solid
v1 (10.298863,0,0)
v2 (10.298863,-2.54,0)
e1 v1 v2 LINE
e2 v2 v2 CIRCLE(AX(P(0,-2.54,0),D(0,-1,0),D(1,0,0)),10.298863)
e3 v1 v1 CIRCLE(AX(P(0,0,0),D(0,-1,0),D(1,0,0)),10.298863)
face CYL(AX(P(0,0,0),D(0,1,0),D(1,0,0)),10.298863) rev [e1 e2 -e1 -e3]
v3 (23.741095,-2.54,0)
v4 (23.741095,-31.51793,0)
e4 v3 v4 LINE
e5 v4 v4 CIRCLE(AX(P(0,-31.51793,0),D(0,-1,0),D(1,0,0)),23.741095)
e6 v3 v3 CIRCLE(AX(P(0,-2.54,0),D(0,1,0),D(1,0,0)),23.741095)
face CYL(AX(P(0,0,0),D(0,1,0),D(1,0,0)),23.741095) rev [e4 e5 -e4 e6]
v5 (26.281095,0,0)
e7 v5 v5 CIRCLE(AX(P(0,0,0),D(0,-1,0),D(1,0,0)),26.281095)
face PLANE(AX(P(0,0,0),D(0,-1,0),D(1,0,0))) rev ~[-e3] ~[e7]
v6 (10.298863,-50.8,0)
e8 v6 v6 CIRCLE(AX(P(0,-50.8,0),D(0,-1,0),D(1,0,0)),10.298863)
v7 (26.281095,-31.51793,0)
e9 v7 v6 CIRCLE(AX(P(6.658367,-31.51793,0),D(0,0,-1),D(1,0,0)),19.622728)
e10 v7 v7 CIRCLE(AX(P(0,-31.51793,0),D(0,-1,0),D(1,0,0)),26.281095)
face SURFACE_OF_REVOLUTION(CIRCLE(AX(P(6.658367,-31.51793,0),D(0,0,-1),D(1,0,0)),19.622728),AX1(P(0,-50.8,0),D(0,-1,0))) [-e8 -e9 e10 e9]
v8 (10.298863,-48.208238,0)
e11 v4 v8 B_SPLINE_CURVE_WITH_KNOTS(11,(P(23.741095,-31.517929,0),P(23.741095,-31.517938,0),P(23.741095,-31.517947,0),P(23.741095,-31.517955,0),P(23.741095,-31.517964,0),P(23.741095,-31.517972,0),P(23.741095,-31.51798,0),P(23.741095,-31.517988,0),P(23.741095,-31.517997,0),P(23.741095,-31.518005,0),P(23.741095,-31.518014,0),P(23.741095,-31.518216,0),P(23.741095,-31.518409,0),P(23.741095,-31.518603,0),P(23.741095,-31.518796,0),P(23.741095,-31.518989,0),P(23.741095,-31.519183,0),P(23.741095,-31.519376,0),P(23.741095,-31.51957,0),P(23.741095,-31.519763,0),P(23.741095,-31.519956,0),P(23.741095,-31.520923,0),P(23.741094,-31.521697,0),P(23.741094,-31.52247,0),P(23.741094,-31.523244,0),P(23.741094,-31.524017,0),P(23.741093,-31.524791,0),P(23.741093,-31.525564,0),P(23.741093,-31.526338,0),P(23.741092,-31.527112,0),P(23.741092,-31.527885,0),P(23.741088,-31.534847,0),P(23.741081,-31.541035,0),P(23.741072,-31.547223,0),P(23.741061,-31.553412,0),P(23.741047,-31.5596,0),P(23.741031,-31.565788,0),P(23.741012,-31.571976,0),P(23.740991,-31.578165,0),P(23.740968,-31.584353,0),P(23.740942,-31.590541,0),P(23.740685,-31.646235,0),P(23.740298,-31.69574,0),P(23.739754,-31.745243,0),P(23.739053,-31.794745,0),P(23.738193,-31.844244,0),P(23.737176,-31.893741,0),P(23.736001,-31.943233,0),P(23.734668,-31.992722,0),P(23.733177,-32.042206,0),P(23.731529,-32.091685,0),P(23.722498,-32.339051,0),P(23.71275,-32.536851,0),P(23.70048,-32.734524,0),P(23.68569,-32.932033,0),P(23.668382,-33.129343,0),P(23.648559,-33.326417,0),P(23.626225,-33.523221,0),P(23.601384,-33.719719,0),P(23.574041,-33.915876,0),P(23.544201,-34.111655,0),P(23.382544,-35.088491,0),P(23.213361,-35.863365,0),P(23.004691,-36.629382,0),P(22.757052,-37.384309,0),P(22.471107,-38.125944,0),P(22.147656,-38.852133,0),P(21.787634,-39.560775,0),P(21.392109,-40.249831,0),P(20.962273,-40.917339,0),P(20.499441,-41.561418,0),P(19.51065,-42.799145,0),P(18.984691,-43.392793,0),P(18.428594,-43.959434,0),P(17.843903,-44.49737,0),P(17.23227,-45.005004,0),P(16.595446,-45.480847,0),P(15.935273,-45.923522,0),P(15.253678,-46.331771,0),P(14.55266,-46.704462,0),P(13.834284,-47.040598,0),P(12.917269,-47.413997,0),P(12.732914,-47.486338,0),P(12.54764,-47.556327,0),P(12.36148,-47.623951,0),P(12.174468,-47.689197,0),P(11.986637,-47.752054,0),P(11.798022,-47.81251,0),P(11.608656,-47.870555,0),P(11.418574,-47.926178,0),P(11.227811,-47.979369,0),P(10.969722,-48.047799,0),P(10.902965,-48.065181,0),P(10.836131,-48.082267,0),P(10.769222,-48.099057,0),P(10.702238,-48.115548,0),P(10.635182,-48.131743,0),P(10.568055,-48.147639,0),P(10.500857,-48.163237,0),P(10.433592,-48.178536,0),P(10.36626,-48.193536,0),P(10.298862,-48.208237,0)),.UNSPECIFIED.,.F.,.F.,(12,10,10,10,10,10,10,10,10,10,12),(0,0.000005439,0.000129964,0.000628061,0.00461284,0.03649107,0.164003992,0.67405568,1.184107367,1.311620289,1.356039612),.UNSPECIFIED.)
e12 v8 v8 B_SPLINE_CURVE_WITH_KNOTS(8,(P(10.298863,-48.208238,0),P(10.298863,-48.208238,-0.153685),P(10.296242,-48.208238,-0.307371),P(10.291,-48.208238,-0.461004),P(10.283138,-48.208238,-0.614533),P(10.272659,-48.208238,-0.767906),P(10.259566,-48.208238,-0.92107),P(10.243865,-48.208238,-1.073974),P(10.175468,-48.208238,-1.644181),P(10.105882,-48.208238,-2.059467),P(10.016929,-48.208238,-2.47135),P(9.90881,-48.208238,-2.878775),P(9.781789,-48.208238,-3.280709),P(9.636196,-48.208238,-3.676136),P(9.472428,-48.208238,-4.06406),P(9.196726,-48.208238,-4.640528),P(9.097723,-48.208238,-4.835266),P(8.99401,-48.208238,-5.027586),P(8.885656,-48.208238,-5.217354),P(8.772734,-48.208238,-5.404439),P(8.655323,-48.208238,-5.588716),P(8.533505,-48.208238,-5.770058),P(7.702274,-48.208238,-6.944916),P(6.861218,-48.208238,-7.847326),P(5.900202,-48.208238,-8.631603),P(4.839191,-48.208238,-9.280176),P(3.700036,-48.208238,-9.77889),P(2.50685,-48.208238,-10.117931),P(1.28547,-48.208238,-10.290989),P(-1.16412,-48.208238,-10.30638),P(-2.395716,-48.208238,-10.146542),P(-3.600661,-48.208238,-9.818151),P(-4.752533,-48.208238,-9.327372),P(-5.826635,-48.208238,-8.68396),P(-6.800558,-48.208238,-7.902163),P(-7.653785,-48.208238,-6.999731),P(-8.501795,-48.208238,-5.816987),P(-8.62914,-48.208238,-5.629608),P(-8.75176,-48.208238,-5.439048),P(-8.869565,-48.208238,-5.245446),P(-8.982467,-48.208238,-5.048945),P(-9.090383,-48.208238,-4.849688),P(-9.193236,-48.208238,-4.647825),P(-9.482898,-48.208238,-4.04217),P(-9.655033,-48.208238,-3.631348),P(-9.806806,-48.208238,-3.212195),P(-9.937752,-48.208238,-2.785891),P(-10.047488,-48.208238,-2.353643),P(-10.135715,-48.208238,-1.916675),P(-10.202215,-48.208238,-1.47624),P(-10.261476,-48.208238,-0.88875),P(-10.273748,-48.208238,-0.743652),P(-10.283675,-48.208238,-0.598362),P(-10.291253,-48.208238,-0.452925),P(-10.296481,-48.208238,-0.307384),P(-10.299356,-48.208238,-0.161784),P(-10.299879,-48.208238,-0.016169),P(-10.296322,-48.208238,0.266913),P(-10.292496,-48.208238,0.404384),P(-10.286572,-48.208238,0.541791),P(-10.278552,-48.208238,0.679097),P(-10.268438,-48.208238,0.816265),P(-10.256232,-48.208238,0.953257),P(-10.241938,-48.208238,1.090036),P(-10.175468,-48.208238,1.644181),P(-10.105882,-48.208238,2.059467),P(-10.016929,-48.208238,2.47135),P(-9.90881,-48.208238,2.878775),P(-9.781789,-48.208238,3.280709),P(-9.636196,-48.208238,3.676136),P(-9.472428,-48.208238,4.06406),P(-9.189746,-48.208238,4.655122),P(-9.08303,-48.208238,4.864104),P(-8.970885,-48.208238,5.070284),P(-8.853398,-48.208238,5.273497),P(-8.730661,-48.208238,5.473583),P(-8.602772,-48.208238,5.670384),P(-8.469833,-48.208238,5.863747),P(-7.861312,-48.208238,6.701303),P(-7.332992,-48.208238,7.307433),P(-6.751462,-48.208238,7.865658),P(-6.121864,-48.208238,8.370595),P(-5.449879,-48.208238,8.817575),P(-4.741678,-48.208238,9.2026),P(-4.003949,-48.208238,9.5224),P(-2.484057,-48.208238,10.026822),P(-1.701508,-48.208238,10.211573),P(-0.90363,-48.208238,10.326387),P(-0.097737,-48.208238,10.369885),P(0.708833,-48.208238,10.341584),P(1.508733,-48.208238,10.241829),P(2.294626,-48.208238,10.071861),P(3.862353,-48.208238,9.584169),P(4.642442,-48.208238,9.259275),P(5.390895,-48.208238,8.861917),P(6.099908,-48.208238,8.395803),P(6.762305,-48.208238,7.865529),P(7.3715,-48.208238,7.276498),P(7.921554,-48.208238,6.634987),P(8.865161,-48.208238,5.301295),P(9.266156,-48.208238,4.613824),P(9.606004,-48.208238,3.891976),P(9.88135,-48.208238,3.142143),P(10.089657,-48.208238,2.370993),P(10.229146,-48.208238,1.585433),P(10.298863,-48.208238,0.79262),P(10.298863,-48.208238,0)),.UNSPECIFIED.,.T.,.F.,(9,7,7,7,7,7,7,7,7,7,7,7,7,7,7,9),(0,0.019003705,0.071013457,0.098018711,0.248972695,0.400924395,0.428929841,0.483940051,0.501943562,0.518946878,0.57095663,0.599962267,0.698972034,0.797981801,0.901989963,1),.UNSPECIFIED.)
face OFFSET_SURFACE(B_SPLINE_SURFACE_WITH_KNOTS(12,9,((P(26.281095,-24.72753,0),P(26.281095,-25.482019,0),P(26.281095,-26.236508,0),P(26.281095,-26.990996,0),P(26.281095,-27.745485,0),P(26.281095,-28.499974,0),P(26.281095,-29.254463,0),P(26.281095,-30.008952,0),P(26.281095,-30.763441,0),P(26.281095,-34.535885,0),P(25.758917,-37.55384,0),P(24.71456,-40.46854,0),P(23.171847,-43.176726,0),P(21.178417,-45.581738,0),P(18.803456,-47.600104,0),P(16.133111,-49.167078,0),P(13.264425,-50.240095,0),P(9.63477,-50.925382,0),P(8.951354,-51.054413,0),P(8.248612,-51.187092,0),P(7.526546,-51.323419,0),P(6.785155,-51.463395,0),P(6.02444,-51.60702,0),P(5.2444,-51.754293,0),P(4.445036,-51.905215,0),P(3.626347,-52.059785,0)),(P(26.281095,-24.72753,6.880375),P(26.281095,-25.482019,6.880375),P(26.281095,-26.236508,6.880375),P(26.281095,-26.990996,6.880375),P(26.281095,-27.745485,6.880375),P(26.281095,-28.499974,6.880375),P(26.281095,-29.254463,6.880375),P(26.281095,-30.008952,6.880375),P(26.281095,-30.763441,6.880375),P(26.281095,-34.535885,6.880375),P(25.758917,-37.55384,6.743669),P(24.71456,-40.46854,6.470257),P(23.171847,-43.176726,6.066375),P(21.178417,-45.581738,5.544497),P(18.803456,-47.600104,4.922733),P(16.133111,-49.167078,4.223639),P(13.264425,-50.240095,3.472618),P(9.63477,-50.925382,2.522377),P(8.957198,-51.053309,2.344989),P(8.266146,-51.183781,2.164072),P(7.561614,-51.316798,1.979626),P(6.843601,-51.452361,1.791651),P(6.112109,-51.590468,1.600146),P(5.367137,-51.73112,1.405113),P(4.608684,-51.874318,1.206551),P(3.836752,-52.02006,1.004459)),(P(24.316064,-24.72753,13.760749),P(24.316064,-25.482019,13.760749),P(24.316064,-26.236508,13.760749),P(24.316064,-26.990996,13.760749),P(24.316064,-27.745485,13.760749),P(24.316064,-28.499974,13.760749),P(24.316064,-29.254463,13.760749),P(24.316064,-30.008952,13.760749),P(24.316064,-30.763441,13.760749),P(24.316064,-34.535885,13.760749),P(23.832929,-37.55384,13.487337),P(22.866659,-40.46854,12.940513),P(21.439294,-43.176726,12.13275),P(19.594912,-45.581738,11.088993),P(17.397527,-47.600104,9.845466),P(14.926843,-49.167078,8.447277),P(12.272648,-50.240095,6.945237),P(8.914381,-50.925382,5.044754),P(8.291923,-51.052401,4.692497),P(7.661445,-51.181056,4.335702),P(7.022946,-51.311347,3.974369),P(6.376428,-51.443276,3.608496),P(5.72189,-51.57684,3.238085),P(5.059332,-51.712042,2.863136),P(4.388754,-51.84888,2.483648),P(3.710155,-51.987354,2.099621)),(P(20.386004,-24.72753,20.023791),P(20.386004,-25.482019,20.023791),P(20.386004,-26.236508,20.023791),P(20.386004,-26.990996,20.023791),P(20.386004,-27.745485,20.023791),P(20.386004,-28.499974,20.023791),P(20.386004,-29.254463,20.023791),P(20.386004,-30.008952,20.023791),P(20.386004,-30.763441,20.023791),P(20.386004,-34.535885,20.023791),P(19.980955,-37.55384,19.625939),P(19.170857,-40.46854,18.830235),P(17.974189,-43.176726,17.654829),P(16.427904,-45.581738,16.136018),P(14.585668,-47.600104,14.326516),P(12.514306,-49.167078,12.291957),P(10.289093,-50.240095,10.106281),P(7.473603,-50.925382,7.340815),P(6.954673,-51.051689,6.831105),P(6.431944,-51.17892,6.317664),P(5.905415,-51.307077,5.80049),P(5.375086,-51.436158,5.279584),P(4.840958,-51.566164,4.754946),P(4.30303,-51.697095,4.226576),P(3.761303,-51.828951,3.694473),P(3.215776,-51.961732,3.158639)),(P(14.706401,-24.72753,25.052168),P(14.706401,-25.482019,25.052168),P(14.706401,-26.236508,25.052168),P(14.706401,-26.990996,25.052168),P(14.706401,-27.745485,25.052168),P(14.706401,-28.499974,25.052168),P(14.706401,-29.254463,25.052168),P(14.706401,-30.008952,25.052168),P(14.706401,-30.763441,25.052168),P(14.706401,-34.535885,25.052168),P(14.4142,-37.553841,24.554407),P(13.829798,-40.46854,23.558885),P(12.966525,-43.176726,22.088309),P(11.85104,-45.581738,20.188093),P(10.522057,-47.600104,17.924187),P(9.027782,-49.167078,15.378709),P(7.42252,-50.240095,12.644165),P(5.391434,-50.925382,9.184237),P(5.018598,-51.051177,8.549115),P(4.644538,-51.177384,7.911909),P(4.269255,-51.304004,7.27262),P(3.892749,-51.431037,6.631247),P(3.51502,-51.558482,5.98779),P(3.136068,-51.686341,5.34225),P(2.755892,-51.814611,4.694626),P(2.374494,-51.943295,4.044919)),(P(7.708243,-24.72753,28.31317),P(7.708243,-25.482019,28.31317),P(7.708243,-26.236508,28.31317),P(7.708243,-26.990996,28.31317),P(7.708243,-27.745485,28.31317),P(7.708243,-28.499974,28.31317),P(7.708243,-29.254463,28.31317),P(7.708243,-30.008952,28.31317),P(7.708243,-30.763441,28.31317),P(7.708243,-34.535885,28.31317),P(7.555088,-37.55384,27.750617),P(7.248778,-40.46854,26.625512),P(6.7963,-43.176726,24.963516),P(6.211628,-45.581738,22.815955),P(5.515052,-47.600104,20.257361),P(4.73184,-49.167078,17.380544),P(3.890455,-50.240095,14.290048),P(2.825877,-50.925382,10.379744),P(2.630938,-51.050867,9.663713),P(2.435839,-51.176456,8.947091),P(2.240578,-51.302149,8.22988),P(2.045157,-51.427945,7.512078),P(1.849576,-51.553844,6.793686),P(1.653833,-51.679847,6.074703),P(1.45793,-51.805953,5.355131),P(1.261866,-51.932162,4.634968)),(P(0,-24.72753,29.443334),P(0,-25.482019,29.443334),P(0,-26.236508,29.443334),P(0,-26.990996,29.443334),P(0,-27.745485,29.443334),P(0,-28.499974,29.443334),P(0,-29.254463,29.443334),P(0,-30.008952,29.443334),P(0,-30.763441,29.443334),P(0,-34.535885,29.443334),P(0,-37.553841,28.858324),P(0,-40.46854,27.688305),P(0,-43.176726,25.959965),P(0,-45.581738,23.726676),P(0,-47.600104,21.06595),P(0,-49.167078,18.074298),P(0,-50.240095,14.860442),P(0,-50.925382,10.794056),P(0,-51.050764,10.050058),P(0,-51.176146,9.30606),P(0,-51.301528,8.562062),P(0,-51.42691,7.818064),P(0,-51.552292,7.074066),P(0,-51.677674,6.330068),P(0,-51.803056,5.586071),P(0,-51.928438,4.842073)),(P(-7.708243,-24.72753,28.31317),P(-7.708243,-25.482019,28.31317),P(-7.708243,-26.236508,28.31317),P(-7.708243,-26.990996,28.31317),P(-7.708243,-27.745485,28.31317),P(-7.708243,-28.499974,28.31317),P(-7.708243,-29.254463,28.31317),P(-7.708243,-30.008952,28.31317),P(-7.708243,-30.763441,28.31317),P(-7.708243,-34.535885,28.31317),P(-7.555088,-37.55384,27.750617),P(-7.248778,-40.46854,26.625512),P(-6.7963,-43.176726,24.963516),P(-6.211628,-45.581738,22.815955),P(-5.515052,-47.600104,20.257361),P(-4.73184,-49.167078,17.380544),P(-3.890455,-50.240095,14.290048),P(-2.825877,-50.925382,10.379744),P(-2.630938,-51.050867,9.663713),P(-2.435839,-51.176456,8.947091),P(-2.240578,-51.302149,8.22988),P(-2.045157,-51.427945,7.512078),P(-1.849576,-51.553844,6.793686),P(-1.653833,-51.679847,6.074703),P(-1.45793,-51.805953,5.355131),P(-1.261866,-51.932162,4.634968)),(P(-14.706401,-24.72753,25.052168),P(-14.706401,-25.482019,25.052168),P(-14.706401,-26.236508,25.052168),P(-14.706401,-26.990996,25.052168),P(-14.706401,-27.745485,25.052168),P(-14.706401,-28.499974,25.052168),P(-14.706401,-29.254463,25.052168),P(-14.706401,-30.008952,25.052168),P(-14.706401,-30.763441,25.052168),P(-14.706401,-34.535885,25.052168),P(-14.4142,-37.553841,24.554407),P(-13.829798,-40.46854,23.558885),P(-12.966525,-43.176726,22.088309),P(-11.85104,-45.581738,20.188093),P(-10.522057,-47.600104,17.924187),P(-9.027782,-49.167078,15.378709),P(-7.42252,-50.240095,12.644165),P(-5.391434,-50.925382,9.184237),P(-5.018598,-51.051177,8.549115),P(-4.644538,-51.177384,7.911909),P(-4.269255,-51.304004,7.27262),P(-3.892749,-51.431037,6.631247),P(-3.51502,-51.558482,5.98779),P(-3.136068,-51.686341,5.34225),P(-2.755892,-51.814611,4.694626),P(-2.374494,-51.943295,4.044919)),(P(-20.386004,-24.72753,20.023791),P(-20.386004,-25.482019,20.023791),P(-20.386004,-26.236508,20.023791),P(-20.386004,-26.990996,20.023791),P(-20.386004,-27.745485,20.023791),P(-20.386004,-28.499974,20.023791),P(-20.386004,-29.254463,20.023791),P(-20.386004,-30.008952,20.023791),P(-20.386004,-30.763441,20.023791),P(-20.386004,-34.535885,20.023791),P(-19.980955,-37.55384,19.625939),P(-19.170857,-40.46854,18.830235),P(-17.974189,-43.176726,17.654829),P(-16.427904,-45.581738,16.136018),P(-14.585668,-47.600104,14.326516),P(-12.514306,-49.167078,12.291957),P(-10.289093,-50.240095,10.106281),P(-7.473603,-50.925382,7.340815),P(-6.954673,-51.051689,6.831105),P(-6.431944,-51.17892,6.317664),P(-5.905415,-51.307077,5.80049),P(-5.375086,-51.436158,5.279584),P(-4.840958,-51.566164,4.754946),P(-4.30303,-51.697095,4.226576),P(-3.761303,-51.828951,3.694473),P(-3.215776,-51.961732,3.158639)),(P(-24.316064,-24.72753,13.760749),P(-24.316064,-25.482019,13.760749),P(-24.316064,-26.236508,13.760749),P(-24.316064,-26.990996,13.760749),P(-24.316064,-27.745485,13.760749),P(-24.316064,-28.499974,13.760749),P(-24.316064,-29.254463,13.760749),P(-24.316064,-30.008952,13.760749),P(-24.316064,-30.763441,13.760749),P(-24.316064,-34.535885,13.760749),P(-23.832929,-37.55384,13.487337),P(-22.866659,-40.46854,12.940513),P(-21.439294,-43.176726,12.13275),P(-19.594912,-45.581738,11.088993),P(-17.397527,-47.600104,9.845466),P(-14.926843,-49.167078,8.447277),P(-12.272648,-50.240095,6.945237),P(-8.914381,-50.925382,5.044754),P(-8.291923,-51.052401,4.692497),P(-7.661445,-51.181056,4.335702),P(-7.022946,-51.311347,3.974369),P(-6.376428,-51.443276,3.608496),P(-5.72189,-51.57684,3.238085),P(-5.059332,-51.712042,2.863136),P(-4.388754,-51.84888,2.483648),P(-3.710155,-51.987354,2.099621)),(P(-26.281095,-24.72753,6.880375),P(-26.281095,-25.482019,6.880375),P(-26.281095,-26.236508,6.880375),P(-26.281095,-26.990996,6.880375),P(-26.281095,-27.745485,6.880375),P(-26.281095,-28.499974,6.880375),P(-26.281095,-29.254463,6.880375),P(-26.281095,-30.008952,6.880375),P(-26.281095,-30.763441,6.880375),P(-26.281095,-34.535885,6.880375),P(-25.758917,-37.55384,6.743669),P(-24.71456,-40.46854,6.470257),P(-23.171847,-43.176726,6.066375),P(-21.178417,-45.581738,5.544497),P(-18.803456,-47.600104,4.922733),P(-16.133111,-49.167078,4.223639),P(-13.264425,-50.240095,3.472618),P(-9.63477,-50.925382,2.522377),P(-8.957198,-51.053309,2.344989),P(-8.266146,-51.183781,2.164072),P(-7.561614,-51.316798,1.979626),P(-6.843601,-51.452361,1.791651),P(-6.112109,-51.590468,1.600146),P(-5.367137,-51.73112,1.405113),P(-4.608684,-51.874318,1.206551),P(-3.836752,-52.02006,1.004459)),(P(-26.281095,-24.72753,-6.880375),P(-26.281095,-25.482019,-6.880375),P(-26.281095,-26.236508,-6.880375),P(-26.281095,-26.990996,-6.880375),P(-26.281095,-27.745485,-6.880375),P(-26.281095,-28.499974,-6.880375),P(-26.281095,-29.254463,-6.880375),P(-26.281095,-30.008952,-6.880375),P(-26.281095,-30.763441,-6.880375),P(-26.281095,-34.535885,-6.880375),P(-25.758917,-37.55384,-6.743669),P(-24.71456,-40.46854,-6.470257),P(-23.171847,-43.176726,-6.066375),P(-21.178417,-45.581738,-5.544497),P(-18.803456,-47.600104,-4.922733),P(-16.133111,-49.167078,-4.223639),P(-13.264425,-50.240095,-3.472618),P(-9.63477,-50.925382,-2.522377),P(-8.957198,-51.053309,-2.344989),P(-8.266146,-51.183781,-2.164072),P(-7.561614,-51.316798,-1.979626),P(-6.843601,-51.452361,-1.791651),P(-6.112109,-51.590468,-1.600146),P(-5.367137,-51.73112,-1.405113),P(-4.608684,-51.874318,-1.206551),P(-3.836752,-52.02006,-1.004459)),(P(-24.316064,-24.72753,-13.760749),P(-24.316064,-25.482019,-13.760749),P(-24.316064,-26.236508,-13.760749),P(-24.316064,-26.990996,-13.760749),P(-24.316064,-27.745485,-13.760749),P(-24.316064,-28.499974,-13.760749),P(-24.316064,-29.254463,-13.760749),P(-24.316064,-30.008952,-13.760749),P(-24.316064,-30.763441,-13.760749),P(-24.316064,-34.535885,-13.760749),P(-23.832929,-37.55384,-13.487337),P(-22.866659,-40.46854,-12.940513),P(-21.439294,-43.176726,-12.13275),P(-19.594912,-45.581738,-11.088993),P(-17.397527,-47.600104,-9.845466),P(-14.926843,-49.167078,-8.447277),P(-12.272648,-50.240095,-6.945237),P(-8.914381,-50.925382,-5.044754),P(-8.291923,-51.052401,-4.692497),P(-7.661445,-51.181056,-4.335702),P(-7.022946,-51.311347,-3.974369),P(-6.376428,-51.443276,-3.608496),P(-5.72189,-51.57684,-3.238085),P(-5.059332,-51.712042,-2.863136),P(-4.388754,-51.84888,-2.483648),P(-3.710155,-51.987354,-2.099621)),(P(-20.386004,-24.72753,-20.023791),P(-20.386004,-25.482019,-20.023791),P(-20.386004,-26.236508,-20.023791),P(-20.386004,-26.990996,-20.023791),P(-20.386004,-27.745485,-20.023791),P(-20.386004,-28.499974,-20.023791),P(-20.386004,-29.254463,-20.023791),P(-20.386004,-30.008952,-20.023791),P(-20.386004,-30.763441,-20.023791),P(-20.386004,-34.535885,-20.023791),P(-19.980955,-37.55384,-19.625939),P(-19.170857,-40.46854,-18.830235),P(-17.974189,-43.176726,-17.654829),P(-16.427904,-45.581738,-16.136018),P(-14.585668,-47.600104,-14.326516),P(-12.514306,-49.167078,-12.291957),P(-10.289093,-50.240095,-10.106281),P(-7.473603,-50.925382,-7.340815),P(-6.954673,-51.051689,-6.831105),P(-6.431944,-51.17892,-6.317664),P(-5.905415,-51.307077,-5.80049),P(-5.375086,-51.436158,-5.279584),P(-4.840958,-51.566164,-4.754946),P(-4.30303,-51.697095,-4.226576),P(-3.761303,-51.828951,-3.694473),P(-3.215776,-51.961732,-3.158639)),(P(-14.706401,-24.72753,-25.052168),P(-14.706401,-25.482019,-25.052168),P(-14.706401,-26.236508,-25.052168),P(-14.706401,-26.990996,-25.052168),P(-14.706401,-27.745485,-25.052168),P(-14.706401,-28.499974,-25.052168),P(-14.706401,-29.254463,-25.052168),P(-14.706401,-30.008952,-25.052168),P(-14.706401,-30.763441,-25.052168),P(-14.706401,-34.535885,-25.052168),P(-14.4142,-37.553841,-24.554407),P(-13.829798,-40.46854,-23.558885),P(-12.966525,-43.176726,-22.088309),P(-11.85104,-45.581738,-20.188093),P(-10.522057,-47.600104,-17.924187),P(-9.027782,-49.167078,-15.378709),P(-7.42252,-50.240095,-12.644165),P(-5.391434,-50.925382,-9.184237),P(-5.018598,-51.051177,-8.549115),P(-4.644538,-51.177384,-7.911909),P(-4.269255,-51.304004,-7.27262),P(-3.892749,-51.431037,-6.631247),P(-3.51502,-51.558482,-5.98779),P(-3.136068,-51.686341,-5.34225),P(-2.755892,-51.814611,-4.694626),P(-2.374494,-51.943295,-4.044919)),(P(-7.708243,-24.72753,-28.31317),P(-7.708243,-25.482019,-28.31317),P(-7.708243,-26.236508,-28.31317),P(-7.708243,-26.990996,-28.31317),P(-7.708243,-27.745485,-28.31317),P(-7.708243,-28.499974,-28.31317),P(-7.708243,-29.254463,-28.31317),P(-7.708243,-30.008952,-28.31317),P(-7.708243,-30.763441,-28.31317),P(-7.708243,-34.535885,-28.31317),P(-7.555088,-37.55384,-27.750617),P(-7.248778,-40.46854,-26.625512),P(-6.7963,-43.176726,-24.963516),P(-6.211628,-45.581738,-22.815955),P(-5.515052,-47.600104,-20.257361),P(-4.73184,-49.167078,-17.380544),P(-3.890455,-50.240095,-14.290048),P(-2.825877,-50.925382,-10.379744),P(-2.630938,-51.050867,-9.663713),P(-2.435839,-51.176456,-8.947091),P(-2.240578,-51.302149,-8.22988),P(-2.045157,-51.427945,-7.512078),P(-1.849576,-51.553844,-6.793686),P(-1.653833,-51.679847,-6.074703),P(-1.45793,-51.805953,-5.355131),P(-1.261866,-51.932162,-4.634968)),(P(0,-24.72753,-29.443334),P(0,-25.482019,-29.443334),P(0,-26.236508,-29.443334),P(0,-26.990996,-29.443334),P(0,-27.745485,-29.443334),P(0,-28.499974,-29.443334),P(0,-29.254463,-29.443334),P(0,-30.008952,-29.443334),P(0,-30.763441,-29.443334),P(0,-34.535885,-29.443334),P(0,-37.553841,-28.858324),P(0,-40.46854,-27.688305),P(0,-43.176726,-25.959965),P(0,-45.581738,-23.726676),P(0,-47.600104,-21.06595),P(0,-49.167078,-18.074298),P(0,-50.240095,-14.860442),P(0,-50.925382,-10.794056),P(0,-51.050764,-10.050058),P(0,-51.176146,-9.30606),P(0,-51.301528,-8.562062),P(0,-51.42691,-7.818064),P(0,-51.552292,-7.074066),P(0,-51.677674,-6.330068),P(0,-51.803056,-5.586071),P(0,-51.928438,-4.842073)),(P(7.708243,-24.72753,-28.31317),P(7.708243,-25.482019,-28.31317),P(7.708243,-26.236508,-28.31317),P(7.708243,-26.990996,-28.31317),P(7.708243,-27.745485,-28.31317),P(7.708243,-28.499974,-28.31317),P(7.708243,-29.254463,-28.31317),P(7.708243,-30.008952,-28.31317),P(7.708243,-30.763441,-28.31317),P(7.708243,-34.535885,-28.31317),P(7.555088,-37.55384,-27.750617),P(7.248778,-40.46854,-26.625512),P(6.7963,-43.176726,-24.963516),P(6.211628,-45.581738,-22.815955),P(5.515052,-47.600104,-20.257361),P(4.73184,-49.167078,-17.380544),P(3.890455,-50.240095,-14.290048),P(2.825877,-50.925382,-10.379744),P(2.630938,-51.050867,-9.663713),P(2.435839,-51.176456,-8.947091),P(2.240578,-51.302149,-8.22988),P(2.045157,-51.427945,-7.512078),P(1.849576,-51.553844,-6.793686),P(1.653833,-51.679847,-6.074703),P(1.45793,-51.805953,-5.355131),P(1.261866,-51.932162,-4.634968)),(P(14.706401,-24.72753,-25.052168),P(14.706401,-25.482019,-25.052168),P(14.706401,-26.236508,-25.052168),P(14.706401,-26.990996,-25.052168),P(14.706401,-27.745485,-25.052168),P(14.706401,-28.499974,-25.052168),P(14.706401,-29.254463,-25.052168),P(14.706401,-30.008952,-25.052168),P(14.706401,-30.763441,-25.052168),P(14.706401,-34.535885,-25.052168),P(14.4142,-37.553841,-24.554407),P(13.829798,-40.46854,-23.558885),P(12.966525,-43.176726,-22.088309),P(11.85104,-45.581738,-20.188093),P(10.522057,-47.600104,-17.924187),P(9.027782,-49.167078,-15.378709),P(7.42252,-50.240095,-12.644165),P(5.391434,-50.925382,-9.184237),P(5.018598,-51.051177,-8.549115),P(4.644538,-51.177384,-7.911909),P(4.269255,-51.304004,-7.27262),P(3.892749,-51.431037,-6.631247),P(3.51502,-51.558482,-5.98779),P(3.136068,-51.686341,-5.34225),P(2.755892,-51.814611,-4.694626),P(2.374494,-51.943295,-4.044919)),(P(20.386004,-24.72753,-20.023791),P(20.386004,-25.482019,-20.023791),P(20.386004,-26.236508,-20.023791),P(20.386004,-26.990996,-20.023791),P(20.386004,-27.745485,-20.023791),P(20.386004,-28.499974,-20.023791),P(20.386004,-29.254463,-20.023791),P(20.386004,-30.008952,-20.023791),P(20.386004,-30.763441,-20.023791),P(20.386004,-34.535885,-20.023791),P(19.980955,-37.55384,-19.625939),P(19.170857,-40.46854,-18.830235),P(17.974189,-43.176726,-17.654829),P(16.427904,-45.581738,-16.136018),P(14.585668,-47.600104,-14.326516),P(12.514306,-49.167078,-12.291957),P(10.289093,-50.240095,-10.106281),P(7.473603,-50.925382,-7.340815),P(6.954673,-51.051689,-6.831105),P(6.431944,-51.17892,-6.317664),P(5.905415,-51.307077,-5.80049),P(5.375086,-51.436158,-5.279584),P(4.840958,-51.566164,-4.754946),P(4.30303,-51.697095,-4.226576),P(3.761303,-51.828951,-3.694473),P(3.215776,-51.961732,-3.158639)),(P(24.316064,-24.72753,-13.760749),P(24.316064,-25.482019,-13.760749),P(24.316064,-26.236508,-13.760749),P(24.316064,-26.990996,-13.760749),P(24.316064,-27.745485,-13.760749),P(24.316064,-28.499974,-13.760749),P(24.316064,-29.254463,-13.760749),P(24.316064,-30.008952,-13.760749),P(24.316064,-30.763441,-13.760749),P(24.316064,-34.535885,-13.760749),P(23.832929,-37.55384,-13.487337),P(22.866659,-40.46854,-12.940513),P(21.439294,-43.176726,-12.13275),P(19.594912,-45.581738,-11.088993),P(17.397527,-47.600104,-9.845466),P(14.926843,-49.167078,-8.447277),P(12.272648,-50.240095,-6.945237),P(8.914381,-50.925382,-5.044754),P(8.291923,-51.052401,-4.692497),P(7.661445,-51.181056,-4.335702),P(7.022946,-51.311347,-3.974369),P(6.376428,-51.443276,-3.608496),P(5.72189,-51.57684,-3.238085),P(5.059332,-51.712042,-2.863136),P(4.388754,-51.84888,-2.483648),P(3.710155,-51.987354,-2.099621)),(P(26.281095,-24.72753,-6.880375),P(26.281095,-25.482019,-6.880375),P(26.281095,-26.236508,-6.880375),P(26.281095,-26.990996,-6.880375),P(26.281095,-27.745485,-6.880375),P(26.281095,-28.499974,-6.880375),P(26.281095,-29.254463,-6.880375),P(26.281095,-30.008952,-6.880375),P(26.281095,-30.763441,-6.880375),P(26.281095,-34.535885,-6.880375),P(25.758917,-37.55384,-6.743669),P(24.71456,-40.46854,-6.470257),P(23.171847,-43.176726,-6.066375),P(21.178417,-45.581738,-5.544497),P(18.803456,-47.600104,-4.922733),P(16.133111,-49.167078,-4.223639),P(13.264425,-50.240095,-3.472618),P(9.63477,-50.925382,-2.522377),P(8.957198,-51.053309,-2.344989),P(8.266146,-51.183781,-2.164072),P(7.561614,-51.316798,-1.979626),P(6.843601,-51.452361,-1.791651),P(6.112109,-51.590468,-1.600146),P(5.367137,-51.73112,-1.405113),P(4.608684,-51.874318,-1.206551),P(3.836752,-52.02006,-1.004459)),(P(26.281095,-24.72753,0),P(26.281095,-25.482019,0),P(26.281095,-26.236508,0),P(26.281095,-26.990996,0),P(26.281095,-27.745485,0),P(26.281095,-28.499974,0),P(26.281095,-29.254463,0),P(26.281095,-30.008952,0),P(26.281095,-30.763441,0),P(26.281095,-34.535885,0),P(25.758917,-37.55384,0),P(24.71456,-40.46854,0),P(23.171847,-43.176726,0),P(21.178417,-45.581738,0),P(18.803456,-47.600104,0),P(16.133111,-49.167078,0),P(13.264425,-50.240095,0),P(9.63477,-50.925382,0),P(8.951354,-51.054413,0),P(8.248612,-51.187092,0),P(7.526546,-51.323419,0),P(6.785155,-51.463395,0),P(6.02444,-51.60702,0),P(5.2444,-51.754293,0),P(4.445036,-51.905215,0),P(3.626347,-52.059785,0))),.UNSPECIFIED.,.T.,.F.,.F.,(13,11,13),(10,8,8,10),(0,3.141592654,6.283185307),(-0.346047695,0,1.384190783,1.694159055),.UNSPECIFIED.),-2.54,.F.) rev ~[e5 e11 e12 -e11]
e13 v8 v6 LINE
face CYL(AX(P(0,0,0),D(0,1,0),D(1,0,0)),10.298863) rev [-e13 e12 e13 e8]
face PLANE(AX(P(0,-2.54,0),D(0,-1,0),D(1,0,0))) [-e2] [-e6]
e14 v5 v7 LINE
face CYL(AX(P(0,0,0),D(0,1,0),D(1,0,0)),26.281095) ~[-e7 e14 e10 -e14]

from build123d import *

# Parameters (mm, degrees)
F0_R     = 26.2810947886
F0_R_2   = 10.298862613
F1_DEPTH = 50.8
F3_T     = -2.54


# Not quite as in the source:
# - a fillet or chamfer that OpenCascade refuses, or shapes differently, is made with other operations: its cross-section is extruded or revolved along the edge and cut away or added


with BuildPart() as f1:
    # F0 (on Front) → F1 (new body)
    with BuildSketch(Plane.XZ):
        Circle(F0_R)
        Circle(F0_R_2, mode=Mode.SUBTRACT)
    extrude(amount=F1_DEPTH)

    # F2: fillet of radius 19.622727835 on 1 edges, made by hand

    # F2_s1 → F2_t2 (revolve, cut)
    with BuildSketch(Plane.XY):
        with BuildLine():
            ThreePointArc((26.2810947886, -31.5179295967), (21.7661117091, -44.0402095843), (10.298862613, -50.8))
            Line((10.298862613, -50.8), (26.2810947886, -50.8))
            Line((26.2810947886, -50.8), (26.2810947886, -31.5179295967))
        make_face()
    revolve(axis=Axis((0, -50.8, 0), (0, -1, 0)), mode=Mode.SUBTRACT)

    # F3
    f3_openings = [f1.faces().sort_by_distance(p)[0] for p in [
        (-10.298863, -25.4, 0),
    ]]
    offset(amount=F3_T, openings=f3_openings)


solid = f1.part
